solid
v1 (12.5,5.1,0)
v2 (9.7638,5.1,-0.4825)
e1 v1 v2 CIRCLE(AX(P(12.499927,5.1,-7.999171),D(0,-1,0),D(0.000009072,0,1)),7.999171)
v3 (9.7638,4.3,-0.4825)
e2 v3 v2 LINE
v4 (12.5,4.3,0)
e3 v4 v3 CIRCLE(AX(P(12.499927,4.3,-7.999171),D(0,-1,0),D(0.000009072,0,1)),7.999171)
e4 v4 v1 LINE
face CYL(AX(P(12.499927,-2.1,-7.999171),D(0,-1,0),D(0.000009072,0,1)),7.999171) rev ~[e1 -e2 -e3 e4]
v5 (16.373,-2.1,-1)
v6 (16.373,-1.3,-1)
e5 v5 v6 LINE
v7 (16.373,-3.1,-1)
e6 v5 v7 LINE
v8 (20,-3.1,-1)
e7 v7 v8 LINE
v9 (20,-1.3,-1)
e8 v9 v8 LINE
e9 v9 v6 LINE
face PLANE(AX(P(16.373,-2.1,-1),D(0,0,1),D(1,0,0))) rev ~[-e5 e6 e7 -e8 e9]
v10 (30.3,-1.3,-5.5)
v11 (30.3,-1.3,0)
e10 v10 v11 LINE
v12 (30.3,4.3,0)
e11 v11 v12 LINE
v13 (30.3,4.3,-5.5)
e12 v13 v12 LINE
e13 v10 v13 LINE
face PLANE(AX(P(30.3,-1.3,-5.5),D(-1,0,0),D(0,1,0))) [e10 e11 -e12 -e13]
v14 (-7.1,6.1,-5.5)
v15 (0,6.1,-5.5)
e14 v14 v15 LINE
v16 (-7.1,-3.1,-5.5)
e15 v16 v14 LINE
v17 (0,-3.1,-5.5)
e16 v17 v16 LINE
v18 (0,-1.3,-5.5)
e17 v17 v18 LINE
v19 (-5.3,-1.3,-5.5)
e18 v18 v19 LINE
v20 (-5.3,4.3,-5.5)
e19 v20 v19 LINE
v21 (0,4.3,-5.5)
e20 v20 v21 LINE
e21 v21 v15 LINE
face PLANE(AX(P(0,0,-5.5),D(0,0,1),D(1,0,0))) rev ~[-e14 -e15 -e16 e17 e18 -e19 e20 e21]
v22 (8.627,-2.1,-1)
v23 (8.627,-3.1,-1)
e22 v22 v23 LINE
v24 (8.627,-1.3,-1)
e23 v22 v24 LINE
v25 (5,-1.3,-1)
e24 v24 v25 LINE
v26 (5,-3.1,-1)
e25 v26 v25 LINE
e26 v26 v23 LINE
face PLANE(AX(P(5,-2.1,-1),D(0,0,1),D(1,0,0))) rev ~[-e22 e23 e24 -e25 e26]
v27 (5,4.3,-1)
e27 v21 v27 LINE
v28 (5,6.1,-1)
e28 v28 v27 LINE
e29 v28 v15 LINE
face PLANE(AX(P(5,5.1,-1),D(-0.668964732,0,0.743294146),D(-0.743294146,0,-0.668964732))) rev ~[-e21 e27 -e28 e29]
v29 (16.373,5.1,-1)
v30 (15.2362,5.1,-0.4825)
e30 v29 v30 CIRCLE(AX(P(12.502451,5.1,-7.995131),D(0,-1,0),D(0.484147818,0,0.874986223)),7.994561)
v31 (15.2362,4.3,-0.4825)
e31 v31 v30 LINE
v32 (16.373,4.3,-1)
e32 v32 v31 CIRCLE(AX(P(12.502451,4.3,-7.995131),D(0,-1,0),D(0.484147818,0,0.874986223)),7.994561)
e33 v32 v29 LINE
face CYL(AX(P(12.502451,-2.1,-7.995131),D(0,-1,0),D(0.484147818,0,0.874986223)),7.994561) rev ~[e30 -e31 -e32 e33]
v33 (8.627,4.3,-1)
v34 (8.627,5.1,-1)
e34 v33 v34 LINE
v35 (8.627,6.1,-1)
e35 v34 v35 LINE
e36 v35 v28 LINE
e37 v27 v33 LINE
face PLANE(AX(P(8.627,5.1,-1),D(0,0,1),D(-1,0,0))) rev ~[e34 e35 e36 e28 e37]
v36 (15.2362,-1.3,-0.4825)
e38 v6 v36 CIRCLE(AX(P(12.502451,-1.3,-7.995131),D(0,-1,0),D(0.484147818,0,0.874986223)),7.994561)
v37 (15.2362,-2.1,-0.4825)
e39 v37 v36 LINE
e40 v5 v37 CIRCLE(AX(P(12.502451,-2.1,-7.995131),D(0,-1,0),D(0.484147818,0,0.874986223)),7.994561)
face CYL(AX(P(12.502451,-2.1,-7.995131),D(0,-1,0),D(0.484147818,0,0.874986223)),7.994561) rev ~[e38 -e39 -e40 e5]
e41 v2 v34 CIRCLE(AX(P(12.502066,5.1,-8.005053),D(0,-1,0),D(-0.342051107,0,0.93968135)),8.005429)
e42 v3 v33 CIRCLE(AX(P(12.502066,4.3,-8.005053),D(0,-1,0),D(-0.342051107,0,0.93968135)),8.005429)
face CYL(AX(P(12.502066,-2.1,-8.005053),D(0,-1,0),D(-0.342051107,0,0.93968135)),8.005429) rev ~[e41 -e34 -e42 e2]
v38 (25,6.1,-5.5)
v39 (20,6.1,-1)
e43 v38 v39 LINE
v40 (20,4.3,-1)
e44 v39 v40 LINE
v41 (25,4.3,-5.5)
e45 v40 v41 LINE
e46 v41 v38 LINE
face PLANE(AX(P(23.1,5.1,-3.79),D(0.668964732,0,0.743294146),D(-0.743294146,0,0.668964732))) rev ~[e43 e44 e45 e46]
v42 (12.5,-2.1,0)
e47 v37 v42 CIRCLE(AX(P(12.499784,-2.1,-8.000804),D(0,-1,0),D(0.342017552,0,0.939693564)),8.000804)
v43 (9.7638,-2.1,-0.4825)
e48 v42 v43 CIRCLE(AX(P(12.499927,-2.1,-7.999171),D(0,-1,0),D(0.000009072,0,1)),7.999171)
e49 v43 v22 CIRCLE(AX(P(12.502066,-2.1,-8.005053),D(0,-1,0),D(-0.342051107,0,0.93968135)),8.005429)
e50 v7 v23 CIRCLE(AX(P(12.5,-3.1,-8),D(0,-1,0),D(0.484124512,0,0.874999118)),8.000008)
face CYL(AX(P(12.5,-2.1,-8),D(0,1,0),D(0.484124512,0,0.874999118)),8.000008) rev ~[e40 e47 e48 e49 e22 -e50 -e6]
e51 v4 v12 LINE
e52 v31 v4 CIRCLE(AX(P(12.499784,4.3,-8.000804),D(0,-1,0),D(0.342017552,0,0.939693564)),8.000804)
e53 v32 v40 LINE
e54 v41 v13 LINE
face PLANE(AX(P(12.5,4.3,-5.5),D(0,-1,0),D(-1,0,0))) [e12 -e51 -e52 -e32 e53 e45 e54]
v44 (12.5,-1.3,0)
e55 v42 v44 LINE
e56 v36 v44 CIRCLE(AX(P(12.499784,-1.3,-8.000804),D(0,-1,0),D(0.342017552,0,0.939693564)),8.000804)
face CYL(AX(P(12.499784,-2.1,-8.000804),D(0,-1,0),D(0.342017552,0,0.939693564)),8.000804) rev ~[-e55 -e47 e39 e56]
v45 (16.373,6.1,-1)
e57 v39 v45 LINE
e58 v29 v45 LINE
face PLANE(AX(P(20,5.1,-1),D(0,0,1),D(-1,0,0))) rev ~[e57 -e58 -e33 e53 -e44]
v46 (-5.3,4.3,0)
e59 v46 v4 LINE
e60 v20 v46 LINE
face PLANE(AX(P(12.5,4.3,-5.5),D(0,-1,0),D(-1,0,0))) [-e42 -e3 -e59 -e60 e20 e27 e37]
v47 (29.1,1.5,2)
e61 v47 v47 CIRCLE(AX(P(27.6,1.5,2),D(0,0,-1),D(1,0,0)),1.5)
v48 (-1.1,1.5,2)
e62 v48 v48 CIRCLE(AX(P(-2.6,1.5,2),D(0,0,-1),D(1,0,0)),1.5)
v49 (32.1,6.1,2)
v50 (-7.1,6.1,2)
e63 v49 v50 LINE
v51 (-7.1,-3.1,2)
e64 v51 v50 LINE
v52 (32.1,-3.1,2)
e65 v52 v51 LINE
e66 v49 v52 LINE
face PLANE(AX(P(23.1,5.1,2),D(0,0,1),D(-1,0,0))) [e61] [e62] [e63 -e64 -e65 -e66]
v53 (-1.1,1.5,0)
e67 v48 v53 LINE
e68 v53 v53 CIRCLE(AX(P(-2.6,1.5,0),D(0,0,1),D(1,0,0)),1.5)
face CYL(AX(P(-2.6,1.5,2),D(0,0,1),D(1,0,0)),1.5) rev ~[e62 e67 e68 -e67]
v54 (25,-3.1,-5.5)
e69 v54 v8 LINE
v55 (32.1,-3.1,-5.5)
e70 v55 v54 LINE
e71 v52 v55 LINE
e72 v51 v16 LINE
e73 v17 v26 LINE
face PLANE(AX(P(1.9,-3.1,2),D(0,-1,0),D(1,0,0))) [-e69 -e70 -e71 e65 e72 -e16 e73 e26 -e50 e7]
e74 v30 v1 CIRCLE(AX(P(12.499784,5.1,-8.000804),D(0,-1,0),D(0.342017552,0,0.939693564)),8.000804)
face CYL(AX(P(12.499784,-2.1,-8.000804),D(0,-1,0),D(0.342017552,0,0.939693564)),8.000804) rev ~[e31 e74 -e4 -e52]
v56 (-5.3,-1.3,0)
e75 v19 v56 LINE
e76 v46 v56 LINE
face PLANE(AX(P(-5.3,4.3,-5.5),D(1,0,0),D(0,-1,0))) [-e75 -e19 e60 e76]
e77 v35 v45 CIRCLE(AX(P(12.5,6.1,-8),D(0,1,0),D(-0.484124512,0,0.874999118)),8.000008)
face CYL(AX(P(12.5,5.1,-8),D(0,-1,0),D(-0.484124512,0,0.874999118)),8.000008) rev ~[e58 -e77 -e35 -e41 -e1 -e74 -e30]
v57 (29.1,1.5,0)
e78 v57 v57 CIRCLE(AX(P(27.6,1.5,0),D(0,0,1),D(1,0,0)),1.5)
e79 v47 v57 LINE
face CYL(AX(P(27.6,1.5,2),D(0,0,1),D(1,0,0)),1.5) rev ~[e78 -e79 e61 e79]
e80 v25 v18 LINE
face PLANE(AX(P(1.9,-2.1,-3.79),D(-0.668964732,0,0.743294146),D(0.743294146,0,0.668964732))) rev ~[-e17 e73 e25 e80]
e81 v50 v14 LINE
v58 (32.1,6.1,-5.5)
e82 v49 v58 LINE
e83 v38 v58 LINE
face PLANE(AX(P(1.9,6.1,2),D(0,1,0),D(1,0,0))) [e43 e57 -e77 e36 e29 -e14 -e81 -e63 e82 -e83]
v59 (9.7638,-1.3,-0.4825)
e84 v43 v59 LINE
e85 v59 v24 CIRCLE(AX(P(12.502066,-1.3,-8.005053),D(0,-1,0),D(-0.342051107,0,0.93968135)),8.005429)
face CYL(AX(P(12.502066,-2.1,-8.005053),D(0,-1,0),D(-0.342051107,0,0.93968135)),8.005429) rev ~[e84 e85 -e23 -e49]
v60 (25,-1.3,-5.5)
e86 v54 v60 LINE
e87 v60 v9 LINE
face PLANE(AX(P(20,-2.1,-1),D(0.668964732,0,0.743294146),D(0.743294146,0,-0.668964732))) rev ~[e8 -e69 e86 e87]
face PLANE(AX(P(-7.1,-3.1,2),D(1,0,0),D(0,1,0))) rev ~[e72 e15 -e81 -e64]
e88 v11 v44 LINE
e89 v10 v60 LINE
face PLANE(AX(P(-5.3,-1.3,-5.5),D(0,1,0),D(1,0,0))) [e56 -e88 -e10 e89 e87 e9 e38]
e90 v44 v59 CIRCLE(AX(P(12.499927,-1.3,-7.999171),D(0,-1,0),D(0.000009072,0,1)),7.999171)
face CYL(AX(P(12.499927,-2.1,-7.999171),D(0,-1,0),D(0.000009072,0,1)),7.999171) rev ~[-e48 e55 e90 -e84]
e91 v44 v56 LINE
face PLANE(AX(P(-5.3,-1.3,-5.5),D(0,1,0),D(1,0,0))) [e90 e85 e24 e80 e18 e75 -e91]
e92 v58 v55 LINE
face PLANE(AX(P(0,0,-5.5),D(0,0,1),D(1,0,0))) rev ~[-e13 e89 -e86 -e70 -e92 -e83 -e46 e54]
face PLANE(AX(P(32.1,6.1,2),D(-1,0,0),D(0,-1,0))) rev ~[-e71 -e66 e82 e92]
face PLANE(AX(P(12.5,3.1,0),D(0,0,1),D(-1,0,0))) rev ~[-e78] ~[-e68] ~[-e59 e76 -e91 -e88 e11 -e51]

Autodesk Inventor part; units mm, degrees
ref_plane "YZ Plane" through (0, 0, 0) normal (1, 0, 0) x (0, 1, 0)
ref_plane "XZ Plane" through (0, 0, 0) normal (0, 1, 0) x (-1, 0, 0)
sketch "Sketch1" plane through (0, 0, 0) normal (0, 0, 1) x (1, 0, 0)
  line L0 (-0.2, 0) -> (25.2, 0) projected
  line L1 (25.4, -1) -> (29.8, -1) projected
  line L2 (30, -0.8) -> (30, 3.8) projected
  line L3 (29.8, 4) -> (25.4, 4) projected
  line L4 (25.2, 3) -> (-0.2, 3) projected
  line L5 (-0.4, 4) -> (-4.8, 4) projected
  line L6 (-5, 3.8) -> (-5, -0.8) projected
  line L7 (-4.8, -1) -> (-0.4, -1) projected
  line L8 (25.1, -0.1) -> (-0.1, -0.1)
  line L9 (-0.1, -0.1) -> (-0.1, -1.1)
  line L10 (-0.1, -1.1) -> (-5.1, -1.1)
  line L11 (-5.1, -1.1) -> (-5.1, 4.1)
  line L12 (-5.1, 4.1) -> (-0.1, 4.1)
  line L13 (-0.1, 4.1) -> (-0.1, 3.1)
  line L14 (-0.1, 3.1) -> (25.1, 3.1)
  line L15 (25.1, 3.1) -> (25.1, 4.1)
  line L16 (25.1, 4.1) -> (30.1, 4.1)
  line L17 (30.1, 4.1) -> (30.1, -1.1)
  line L18 (30.1, -1.1) -> (25.1, -1.1)
  line L19 (25.1, -1.1) -> (25.1, -0.1)
  circle A0 centre (27.6, 1.5) radius 1.4 projected
  circle A1 centre (-2.6, 1.5) radius 1.4 projected
  line L20 (25.4, -1) -> (25.2, -0.8) projected
  line L21 (30, -0.8) -> (29.8, -1) projected
  line L22 (29.8, 4) -> (30, 3.8) projected
  line L23 (25.2, 3.8) -> (25.4, 4) projected
  line L24 (-0.4, 4) -> (-0.2, 3.8) projected
  line L25 (-5, 3.8) -> (-4.8, 4) projected
  line L26 (-4.8, -1) -> (-5, -0.8) projected
  line L27 (-0.2, -0.8) -> (-0.4, -1) projected
  line L28 (25.2, 3.8) -> (25.2, 3) projected
  line L29 (-0.2, 3) -> (-0.2, 3.8) projected
  line L30 (-0.2, -0.8) -> (-0.2, 0) projected
  line L31 (25.2, 0) -> (25.2, -0.8) projected
  point P0 (0, 0)
  dimension "d0" = 0.1
extrude "Extrusion1" add sketch "Sketch1" along normal blind 2 contours L30 L27 L7 L26 L6 L25 L5 L24 L29 L4 L28 L23 L3 L22 L2 L21 L1 L20 L31 L0 | L8 L9 L10 L11 L12 L13 L14 L15 L16 L17 L18 L19 | A0 | A1
sketch "Sketch2" plane through (0, 0, 2) normal (0, 0, 1) x (1, 0, 0)
  line L0 (25.1, -1.1) -> (30.1, -1.1) projected
  line L1 (30.1, -1.1) -> (30.1, 4.1) projected
  line L2 (30.1, 4.1) -> (25.1, 4.1) projected
  line L3 (25.1, 4.1) -> (25.1, 3.1) projected
  line L4 (25.1, 3.1) -> (-0.1, 3.1) projected
  line L5 (-0.1, 3.1) -> (-0.1, 4.1) projected
  line L6 (-0.1, 4.1) -> (-5.1, 4.1) projected
  line L7 (-5.1, 4.1) -> (-5.1, -1.1) projected
  line L8 (-5.1, -1.1) -> (-0.1, -1.1) projected
  line L9 (-0.1, -1.1) -> (-0.1, -0.1) projected
  line L10 (-0.1, -0.1) -> (25.1, -0.1) projected
  line L11 (25.1, -0.1) -> (25.1, -1.1) projected
  line L12 (-7.1, 6.1) -> (1.9, 6.1)
  line L13 (1.9, 6.1) -> (1.9, 5.1)
  line L14 (1.9, 5.1) -> (23.1, 5.1)
  line L15 (23.1, 5.1) -> (23.1, 6.1)
  line L16 (23.1, 6.1) -> (32.1, 6.1)
  line L17 (32.1, 6.1) -> (32.1, -3.1)
  line L18 (32.1, -3.1) -> (23.1, -3.1)
  line L19 (23.1, -3.1) -> (23.1, -2.1)
  line L20 (23.1, -2.1) -> (1.9, -2.1)
  line L21 (1.9, -2.1) -> (1.9, -3.1)
  line L22 (1.9, -3.1) -> (-7.1, -3.1)
  line L23 (-7.1, -3.1) -> (-7.1, 6.1)
  point P0 (0, 0)
  dimension "d3" = 2
ref_plane "Work Plane1" through (22.5, -3.5, -5.5) normal (0, 0, -1) x (0, 1, 0)
extrude "Extrusion2" add sketch "Sketch2" against normal up to surface (7.5 mm away)
sketch "Sketch3" plane through (1.9, -2.1, 2) normal (0, -1, 0) x (1, 0, 0)
  line L0 (6.9944, -4) -> (4.1, -4) projected
  arc A0 (8.2059, -3.4222) -> (6.9944, -4) centre (10.6, -10) ccw projected
  arc A1 (10.6, -3) -> (8.2059, -3.4222) centre (10.6, -10) ccw projected
  arc A2 (10.6, -3) -> (8.2059, -3.4222) centre (10.6, -10) ccw projected
  arc A3 (12.9941, -3.4222) -> (10.6, -3) centre (10.6, -10) ccw projected
  circle A4 centre (10.6, -10) radius 5.6 projected
  arc A5 (14.2056, -4) -> (12.9941, -3.4222) centre (10.6, -10) ccw projected
  line L1 (17.1, -4) -> (14.2056, -4) projected
  line L2 (17.1, -7.4019) -> (17.1, -4) projected
  line L3 (4.1, -4) -> (4.1, -7.4019) projected
  circle A6 centre (10.6, -10) radius 5.6 projected
  arc A7 (4.1, -7.4019) -> (3.8918, -8) centre (10.6, -10) ccw projected
  arc A8 (17.3082, -8) -> (17.1, -7.4019) centre (10.6, -10) ccw projected
  arc A9 (7.8638, -2.4825) -> (6.727, -3) centre (10.6, -10) ccw
  line L4 (6.727, -3) -> (3.1, -3)
  line L5 (3.1, -3) -> (3.1, -7.2161)
  arc A10 (3.1, -7.2161) -> (2.9335, -7.7143) centre (10.6, -10) ccw
  arc A11 (10.6, -2) -> (7.8638, -2.4825) centre (10.6, -10) ccw
  arc A12 (13.3362, -2.4825) -> (10.6, -2) centre (10.6, -10) ccw
  arc A13 (14.473, -3) -> (13.3362, -2.4825) centre (10.6, -10) ccw
  line L6 (14.473, -3) -> (18.1, -3)
  line L7 (18.1, -3) -> (18.1, -7.2161)
  arc A14 (18.2665, -7.7143) -> (18.1, -7.2161) centre (10.6, -10) ccw
  line L8 (0, -7.5) -> (21.2, -7.5) projected
  point P0 (-1.9, -2)
  point P1 (17.1383, -7.5)
  point P2 (18.1993, -7.5)
  point P3 (10.6, -2)
  point P4 (7.8638, -2.4825)
  point P5 (3.0007, -7.5)
  point P6 (4.0617, -7.5)
  dimension "d6" = 1
  dimension "d7" = 1
  dimension "d8" = 1
extrude "Extrusion3" cut sketch "Sketch3" against normal blind 10 contours A0 A1 A3 A5 L1 L2 A8 L8 A4 A7 L3 L0 | L0 L3 A7 L8 A10 L5 L4 A9 A11 A12 A13 L6 L7 A14 A8 L2 L1 A5 A3 A1 A0 | A4 L8 picked at (9.9261, -6.5925)
sketch "Sketch4" plane through (1.9, -2.1, 2) normal (0, -1, 0) x (1, 0, 0)
  line L0 (3.1, -7.2161) -> (3.1, -3) projected
  line L1 (0, -7.5) -> (3.0007, -7.5) projected
  line L2 (-9, -7.5) -> (0, -7.5) projected
  line L3 (-1.9, -6.3) -> (-1.9, -15) projected
  line L4 (18.1, -3) -> (18.1, -7.2161) projected
  arc A0 (3.1, -7.2161) -> (3.0007, -7.5) centre (10.6, -10) ccw projected
  arc A1 (18.1993, -7.5) -> (18.1, -7.2161) centre (10.6, -10) ccw projected
  line L5 (18.1993, -7.5) -> (21.2, -7.5) projected
  line L6 (21.2, -7.5) -> (30.2, -7.5) projected
  line L7 (23.1, -15) -> (23.1, -6.3) projected
  line L8 (3.1, -3) -> (-1.9, -7.5)
  line L9 (18.1, -3) -> (14.473, -3) projected
  line L10 (18.1, -3) -> (23.1, -7.5)
  point P0 (-1.9, -2)
extrude "Extrusion4" cut sketch "Sketch4" along normal mid plane 33.75
sketch "Sketch5" plane through (0, 0, 2) normal (0, 0, 1) x (1, 0, 0)
  line L0 (-3.9999, -1) -> (-4.8, -1) projected
  line L1 (-5, -0.8) -> (-5, 3.8) projected
  line L2 (-4.8, 4) -> (-3.9999, 4) projected
  line L3 (28.9999, 4) -> (29.8, 4) projected
  line L4 (30, 3.8) -> (30, -0.8) projected
  line L5 (29.8, -1) -> (28.9999, -1) projected
  line L6 (25.2, 4) -> (30, -1)
  line L7 (-0.2, 4) -> (-5, -1)
  circle A0 centre (-2.6, 1.5) radius 1.5
  circle A1 centre (27.6, 1.5) radius 1.5
  line L8 (30, 3.8) -> (29.8, 4) projected
  line L9 (29.8, -1) -> (30, -0.8) projected
  line L10 (-5, -0.8) -> (-4.8, -1) projected
  line L11 (-4.8, 4) -> (-5, 3.8) projected
  arc A2 (-3.9999, 1.5167) -> (-3.9999, 1.4833) centre (-2.6, 1.5) ccw projected
  line L12 (-3.9999, 1.5167) -> (-3.9999, 4) projected
  line L13 (-3.9999, -1) -> (-3.9999, 1.4833) projected
  arc A3 (28.9999, 1.4833) -> (28.9999, 1.5167) centre (27.6, 1.5) ccw projected
  line L14 (28.9999, 1.4833) -> (28.9999, -1) projected
  line L15 (28.9999, 4) -> (28.9999, 1.5167) projected
  point P0 (-2.6, 1.5)
  point P1 (27.6, 1.5)
  dimension "d13" = 3
  dimension "d14" = 3
extrude "Extrusion5" cut sketch "Sketch5" against normal blind 33.75 contours A0 L13 A2 L12 L7 | L7 A0 | A0 L12 A2 L13 | L15 A3 L14 A1 L6 | A1 L14 A3 L15 | L6 A1
chamfer "Chamfer1" distance 0.2 angle 45 4 edges at (25.1, 3.1, -2.75) (25.1, -0.1, -2.75) (-0.1, -0.1, -2.75) (-0.1, 3.1, -2.75)
sketch "Sketch6" plane through (16.373, 3.1, -1) normal (0, -1, 0) x (1, 0, 0)
  line L0 (8.527, 1) -> (8.527, -4.41) projected
  line L1 (8.527, 1) -> (-3.873, 1) projected
  arc A0 (0, 0) -> (-3.873, 1) centre (-3.873, -7) ccw projected
  line L2 (0, 0) -> (3.627, 0) projected
  line L3 (3.627, 0) -> (8.527, -4.41) projected
  line L4 (8.627, -4.5) -> (8.727, -4.5) projected
  line L5 (8.727, -4.5) -> (8.727, 1) projected
  line L6 (8.727, 1) -> (8.527, 1) projected
  line L7 (8.527, 1) -> (8.527, -4.41) projected
  line L8 (8.527, -4.41) -> (8.627, -4.5) projected
  line L9 (8.727, 1) -> (8.727, -4.5) projected
  line L10 (-16.273, -4.41) -> (-16.273, 1) projected
  line L11 (-16.273, -4.41) -> (-11.373, 0) projected
  line L12 (-11.373, 0) -> (-7.746, 0) projected
  arc A1 (-3.873, 1) -> (-7.746, 0) centre (-3.873, -7) ccw projected
  line L13 (-3.873, 1) -> (-16.273, 1) projected
  line L14 (-16.373, -4.5) -> (-16.273, -4.41) projected
  line L15 (-16.273, -4.41) -> (-16.273, 1) projected
  line L16 (-16.273, 1) -> (-16.473, 1) projected
  line L17 (-16.473, 1) -> (-16.473, -4.5) projected
  line L18 (-16.473, -4.5) -> (-16.373, -4.5) projected
  point P0 (-16.373, 1)
  point P1 (-3.873, 1)
  point P2 (-3.873, 1)
  point P3 (-3.873, 1)
  point P4 (-3.873, 1)
  point P5 (8.527, 1)
extrude "Extrusion6" cut sketch "Sketch6" against normal up to surface (1 mm away)
sketch "Sketch7" plane through (16.373, -0.1, -1) normal (0, 1, 0) x (1, 0, 0)
  line L0 (-16.273, -1) -> (-16.273, 4.41) projected
  line L1 (-16.273, -1) -> (-3.873, -1) projected
  arc A0 (-7.746, 0) -> (-3.873, -1) centre (-3.873, 7) ccw projected
  line L2 (-7.746, 0) -> (-11.373, 0) projected
  line L3 (-11.373, 0) -> (-16.273, 4.41) projected
  line L4 (-16.373, 4.5) -> (-16.473, 4.5) projected
  line L5 (-16.473, 4.5) -> (-16.473, -1) projected
  line L6 (-16.473, -1) -> (-16.273, -1) projected
  line L7 (-16.273, -1) -> (-16.273, 4.41) projected
  line L8 (-16.273, 4.41) -> (-16.373, 4.5) projected
  line L9 (8.527, 4.41) -> (8.527, -1) projected
  line L10 (8.527, 4.41) -> (3.627, 0) projected
  line L11 (3.627, 0) -> (0, 0) projected
  arc A1 (-3.873, -1) -> (0, 0) centre (-3.873, 7) ccw projected
  line L12 (-3.873, -1) -> (8.527, -1) projected
  line L13 (8.627, 4.5) -> (8.527, 4.41) projected
  line L14 (8.527, 4.41) -> (8.527, -1) projected
  line L15 (8.527, -1) -> (8.727, -1) projected
  line L16 (8.727, -1) -> (8.727, 4.5) projected
  line L17 (8.727, 4.5) -> (8.627, 4.5) projected
  point P0 (-16.373, -1)
extrude "Extrusion7" cut sketch "Sketch7" against normal up to surface (1 mm away)
sketch "Sketch8" plane through (1.9, -2.1, 2) normal (0, -1, 0) x (1, 0, 0)
  line L0 (18.1, -3) -> (21.2, -5.79) projected
  line L1 (21.2, 0) -> (21.2, -5.79) projected
  line L2 (0, 0) -> (21.2, 0) projected
  line L3 (0, 0) -> (0, -5.79) projected
  line L4 (0, -5.79) -> (3.1, -3) projected
  line L5 (3.1, -3) -> (6.727, -3) projected
  arc A0 (14.473, -3) -> (6.727, -3) centre (10.6, -10) ccw projected
  line L6 (14.473, -3) -> (18.1, -3) projected
  point P0 (-1.9, -2)
extrude "Extrusion8" add sketch "Sketch8" along normal up to surface (1 mm away)
sketch "Sketch9" plane through (1.9, 5.1, 2) normal (0, 1, 0) x (1, 0, 0)
  line L0 (21.2, 5.79) -> (18.1, 3) projected
  line L1 (18.1, 3) -> (14.473, 3) projected
  arc A0 (6.727, 3) -> (14.473, 3) centre (10.6, 10) ccw projected
  line L2 (6.727, 3) -> (3.1, 3) projected
  line L3 (3.1, 3) -> (0, 5.79) projected
  line L4 (0, 0) -> (0, 5.79) projected
  line L5 (21.2, 0) -> (0, 0) projected
  line L6 (21.2, 0) -> (21.2, 5.79) projected
  point P0 (-1.9, 2)
extrude "Extrusion9" add sketch "Sketch9" along normal up to surface (1 mm away)
sketch "Sketch10" plane through (32.1, -3.1, -5.5) normal (0, 0, -1) x (-1, 0, 0)
  line L0 (37.2, 2) -> (19.6, 2) projected
  line L1 (37.2, 7.2) -> (37.2, 2) projected
  line L2 (37.2, 7.2) -> (19.6, 7.2) projected
  line L3 (2, 7.2) -> (19.6, 7.2) projected
  line L4 (2, 2) -> (2, 7.2) projected
  line L5 (19.6, 2) -> (2, 2) projected
  circle A0 centre (34.7, 4.6) radius 1.5 projected
  circle A1 centre (4.5, 4.6) radius 1.5 projected
  line L6 (19.6, 7.4) -> (37.4, 7.4)
  line L7 (37.4, 7.4) -> (37.4, 1.8)
  line L8 (37.4, 1.8) -> (19.6, 1.8)
  line L9 (19.6, 1.8) -> (1.8, 1.8)
  line L10 (1.8, 1.8) -> (1.8, 7.4)
  line L11 (1.8, 7.4) -> (19.6, 7.4)
  point P0 (32.1, 3.1)
  dimension "d28" = 0.2
extrude "Extrusion10" cut sketch "Sketch10" against normal up to surface (5.5 mm away) contours L0 L5 L4 L3 L2 L1 | A0 | A1 | L6 L7 L8 L9 L10 L11
properties part number "CameraTopSlider_3DPrint"
